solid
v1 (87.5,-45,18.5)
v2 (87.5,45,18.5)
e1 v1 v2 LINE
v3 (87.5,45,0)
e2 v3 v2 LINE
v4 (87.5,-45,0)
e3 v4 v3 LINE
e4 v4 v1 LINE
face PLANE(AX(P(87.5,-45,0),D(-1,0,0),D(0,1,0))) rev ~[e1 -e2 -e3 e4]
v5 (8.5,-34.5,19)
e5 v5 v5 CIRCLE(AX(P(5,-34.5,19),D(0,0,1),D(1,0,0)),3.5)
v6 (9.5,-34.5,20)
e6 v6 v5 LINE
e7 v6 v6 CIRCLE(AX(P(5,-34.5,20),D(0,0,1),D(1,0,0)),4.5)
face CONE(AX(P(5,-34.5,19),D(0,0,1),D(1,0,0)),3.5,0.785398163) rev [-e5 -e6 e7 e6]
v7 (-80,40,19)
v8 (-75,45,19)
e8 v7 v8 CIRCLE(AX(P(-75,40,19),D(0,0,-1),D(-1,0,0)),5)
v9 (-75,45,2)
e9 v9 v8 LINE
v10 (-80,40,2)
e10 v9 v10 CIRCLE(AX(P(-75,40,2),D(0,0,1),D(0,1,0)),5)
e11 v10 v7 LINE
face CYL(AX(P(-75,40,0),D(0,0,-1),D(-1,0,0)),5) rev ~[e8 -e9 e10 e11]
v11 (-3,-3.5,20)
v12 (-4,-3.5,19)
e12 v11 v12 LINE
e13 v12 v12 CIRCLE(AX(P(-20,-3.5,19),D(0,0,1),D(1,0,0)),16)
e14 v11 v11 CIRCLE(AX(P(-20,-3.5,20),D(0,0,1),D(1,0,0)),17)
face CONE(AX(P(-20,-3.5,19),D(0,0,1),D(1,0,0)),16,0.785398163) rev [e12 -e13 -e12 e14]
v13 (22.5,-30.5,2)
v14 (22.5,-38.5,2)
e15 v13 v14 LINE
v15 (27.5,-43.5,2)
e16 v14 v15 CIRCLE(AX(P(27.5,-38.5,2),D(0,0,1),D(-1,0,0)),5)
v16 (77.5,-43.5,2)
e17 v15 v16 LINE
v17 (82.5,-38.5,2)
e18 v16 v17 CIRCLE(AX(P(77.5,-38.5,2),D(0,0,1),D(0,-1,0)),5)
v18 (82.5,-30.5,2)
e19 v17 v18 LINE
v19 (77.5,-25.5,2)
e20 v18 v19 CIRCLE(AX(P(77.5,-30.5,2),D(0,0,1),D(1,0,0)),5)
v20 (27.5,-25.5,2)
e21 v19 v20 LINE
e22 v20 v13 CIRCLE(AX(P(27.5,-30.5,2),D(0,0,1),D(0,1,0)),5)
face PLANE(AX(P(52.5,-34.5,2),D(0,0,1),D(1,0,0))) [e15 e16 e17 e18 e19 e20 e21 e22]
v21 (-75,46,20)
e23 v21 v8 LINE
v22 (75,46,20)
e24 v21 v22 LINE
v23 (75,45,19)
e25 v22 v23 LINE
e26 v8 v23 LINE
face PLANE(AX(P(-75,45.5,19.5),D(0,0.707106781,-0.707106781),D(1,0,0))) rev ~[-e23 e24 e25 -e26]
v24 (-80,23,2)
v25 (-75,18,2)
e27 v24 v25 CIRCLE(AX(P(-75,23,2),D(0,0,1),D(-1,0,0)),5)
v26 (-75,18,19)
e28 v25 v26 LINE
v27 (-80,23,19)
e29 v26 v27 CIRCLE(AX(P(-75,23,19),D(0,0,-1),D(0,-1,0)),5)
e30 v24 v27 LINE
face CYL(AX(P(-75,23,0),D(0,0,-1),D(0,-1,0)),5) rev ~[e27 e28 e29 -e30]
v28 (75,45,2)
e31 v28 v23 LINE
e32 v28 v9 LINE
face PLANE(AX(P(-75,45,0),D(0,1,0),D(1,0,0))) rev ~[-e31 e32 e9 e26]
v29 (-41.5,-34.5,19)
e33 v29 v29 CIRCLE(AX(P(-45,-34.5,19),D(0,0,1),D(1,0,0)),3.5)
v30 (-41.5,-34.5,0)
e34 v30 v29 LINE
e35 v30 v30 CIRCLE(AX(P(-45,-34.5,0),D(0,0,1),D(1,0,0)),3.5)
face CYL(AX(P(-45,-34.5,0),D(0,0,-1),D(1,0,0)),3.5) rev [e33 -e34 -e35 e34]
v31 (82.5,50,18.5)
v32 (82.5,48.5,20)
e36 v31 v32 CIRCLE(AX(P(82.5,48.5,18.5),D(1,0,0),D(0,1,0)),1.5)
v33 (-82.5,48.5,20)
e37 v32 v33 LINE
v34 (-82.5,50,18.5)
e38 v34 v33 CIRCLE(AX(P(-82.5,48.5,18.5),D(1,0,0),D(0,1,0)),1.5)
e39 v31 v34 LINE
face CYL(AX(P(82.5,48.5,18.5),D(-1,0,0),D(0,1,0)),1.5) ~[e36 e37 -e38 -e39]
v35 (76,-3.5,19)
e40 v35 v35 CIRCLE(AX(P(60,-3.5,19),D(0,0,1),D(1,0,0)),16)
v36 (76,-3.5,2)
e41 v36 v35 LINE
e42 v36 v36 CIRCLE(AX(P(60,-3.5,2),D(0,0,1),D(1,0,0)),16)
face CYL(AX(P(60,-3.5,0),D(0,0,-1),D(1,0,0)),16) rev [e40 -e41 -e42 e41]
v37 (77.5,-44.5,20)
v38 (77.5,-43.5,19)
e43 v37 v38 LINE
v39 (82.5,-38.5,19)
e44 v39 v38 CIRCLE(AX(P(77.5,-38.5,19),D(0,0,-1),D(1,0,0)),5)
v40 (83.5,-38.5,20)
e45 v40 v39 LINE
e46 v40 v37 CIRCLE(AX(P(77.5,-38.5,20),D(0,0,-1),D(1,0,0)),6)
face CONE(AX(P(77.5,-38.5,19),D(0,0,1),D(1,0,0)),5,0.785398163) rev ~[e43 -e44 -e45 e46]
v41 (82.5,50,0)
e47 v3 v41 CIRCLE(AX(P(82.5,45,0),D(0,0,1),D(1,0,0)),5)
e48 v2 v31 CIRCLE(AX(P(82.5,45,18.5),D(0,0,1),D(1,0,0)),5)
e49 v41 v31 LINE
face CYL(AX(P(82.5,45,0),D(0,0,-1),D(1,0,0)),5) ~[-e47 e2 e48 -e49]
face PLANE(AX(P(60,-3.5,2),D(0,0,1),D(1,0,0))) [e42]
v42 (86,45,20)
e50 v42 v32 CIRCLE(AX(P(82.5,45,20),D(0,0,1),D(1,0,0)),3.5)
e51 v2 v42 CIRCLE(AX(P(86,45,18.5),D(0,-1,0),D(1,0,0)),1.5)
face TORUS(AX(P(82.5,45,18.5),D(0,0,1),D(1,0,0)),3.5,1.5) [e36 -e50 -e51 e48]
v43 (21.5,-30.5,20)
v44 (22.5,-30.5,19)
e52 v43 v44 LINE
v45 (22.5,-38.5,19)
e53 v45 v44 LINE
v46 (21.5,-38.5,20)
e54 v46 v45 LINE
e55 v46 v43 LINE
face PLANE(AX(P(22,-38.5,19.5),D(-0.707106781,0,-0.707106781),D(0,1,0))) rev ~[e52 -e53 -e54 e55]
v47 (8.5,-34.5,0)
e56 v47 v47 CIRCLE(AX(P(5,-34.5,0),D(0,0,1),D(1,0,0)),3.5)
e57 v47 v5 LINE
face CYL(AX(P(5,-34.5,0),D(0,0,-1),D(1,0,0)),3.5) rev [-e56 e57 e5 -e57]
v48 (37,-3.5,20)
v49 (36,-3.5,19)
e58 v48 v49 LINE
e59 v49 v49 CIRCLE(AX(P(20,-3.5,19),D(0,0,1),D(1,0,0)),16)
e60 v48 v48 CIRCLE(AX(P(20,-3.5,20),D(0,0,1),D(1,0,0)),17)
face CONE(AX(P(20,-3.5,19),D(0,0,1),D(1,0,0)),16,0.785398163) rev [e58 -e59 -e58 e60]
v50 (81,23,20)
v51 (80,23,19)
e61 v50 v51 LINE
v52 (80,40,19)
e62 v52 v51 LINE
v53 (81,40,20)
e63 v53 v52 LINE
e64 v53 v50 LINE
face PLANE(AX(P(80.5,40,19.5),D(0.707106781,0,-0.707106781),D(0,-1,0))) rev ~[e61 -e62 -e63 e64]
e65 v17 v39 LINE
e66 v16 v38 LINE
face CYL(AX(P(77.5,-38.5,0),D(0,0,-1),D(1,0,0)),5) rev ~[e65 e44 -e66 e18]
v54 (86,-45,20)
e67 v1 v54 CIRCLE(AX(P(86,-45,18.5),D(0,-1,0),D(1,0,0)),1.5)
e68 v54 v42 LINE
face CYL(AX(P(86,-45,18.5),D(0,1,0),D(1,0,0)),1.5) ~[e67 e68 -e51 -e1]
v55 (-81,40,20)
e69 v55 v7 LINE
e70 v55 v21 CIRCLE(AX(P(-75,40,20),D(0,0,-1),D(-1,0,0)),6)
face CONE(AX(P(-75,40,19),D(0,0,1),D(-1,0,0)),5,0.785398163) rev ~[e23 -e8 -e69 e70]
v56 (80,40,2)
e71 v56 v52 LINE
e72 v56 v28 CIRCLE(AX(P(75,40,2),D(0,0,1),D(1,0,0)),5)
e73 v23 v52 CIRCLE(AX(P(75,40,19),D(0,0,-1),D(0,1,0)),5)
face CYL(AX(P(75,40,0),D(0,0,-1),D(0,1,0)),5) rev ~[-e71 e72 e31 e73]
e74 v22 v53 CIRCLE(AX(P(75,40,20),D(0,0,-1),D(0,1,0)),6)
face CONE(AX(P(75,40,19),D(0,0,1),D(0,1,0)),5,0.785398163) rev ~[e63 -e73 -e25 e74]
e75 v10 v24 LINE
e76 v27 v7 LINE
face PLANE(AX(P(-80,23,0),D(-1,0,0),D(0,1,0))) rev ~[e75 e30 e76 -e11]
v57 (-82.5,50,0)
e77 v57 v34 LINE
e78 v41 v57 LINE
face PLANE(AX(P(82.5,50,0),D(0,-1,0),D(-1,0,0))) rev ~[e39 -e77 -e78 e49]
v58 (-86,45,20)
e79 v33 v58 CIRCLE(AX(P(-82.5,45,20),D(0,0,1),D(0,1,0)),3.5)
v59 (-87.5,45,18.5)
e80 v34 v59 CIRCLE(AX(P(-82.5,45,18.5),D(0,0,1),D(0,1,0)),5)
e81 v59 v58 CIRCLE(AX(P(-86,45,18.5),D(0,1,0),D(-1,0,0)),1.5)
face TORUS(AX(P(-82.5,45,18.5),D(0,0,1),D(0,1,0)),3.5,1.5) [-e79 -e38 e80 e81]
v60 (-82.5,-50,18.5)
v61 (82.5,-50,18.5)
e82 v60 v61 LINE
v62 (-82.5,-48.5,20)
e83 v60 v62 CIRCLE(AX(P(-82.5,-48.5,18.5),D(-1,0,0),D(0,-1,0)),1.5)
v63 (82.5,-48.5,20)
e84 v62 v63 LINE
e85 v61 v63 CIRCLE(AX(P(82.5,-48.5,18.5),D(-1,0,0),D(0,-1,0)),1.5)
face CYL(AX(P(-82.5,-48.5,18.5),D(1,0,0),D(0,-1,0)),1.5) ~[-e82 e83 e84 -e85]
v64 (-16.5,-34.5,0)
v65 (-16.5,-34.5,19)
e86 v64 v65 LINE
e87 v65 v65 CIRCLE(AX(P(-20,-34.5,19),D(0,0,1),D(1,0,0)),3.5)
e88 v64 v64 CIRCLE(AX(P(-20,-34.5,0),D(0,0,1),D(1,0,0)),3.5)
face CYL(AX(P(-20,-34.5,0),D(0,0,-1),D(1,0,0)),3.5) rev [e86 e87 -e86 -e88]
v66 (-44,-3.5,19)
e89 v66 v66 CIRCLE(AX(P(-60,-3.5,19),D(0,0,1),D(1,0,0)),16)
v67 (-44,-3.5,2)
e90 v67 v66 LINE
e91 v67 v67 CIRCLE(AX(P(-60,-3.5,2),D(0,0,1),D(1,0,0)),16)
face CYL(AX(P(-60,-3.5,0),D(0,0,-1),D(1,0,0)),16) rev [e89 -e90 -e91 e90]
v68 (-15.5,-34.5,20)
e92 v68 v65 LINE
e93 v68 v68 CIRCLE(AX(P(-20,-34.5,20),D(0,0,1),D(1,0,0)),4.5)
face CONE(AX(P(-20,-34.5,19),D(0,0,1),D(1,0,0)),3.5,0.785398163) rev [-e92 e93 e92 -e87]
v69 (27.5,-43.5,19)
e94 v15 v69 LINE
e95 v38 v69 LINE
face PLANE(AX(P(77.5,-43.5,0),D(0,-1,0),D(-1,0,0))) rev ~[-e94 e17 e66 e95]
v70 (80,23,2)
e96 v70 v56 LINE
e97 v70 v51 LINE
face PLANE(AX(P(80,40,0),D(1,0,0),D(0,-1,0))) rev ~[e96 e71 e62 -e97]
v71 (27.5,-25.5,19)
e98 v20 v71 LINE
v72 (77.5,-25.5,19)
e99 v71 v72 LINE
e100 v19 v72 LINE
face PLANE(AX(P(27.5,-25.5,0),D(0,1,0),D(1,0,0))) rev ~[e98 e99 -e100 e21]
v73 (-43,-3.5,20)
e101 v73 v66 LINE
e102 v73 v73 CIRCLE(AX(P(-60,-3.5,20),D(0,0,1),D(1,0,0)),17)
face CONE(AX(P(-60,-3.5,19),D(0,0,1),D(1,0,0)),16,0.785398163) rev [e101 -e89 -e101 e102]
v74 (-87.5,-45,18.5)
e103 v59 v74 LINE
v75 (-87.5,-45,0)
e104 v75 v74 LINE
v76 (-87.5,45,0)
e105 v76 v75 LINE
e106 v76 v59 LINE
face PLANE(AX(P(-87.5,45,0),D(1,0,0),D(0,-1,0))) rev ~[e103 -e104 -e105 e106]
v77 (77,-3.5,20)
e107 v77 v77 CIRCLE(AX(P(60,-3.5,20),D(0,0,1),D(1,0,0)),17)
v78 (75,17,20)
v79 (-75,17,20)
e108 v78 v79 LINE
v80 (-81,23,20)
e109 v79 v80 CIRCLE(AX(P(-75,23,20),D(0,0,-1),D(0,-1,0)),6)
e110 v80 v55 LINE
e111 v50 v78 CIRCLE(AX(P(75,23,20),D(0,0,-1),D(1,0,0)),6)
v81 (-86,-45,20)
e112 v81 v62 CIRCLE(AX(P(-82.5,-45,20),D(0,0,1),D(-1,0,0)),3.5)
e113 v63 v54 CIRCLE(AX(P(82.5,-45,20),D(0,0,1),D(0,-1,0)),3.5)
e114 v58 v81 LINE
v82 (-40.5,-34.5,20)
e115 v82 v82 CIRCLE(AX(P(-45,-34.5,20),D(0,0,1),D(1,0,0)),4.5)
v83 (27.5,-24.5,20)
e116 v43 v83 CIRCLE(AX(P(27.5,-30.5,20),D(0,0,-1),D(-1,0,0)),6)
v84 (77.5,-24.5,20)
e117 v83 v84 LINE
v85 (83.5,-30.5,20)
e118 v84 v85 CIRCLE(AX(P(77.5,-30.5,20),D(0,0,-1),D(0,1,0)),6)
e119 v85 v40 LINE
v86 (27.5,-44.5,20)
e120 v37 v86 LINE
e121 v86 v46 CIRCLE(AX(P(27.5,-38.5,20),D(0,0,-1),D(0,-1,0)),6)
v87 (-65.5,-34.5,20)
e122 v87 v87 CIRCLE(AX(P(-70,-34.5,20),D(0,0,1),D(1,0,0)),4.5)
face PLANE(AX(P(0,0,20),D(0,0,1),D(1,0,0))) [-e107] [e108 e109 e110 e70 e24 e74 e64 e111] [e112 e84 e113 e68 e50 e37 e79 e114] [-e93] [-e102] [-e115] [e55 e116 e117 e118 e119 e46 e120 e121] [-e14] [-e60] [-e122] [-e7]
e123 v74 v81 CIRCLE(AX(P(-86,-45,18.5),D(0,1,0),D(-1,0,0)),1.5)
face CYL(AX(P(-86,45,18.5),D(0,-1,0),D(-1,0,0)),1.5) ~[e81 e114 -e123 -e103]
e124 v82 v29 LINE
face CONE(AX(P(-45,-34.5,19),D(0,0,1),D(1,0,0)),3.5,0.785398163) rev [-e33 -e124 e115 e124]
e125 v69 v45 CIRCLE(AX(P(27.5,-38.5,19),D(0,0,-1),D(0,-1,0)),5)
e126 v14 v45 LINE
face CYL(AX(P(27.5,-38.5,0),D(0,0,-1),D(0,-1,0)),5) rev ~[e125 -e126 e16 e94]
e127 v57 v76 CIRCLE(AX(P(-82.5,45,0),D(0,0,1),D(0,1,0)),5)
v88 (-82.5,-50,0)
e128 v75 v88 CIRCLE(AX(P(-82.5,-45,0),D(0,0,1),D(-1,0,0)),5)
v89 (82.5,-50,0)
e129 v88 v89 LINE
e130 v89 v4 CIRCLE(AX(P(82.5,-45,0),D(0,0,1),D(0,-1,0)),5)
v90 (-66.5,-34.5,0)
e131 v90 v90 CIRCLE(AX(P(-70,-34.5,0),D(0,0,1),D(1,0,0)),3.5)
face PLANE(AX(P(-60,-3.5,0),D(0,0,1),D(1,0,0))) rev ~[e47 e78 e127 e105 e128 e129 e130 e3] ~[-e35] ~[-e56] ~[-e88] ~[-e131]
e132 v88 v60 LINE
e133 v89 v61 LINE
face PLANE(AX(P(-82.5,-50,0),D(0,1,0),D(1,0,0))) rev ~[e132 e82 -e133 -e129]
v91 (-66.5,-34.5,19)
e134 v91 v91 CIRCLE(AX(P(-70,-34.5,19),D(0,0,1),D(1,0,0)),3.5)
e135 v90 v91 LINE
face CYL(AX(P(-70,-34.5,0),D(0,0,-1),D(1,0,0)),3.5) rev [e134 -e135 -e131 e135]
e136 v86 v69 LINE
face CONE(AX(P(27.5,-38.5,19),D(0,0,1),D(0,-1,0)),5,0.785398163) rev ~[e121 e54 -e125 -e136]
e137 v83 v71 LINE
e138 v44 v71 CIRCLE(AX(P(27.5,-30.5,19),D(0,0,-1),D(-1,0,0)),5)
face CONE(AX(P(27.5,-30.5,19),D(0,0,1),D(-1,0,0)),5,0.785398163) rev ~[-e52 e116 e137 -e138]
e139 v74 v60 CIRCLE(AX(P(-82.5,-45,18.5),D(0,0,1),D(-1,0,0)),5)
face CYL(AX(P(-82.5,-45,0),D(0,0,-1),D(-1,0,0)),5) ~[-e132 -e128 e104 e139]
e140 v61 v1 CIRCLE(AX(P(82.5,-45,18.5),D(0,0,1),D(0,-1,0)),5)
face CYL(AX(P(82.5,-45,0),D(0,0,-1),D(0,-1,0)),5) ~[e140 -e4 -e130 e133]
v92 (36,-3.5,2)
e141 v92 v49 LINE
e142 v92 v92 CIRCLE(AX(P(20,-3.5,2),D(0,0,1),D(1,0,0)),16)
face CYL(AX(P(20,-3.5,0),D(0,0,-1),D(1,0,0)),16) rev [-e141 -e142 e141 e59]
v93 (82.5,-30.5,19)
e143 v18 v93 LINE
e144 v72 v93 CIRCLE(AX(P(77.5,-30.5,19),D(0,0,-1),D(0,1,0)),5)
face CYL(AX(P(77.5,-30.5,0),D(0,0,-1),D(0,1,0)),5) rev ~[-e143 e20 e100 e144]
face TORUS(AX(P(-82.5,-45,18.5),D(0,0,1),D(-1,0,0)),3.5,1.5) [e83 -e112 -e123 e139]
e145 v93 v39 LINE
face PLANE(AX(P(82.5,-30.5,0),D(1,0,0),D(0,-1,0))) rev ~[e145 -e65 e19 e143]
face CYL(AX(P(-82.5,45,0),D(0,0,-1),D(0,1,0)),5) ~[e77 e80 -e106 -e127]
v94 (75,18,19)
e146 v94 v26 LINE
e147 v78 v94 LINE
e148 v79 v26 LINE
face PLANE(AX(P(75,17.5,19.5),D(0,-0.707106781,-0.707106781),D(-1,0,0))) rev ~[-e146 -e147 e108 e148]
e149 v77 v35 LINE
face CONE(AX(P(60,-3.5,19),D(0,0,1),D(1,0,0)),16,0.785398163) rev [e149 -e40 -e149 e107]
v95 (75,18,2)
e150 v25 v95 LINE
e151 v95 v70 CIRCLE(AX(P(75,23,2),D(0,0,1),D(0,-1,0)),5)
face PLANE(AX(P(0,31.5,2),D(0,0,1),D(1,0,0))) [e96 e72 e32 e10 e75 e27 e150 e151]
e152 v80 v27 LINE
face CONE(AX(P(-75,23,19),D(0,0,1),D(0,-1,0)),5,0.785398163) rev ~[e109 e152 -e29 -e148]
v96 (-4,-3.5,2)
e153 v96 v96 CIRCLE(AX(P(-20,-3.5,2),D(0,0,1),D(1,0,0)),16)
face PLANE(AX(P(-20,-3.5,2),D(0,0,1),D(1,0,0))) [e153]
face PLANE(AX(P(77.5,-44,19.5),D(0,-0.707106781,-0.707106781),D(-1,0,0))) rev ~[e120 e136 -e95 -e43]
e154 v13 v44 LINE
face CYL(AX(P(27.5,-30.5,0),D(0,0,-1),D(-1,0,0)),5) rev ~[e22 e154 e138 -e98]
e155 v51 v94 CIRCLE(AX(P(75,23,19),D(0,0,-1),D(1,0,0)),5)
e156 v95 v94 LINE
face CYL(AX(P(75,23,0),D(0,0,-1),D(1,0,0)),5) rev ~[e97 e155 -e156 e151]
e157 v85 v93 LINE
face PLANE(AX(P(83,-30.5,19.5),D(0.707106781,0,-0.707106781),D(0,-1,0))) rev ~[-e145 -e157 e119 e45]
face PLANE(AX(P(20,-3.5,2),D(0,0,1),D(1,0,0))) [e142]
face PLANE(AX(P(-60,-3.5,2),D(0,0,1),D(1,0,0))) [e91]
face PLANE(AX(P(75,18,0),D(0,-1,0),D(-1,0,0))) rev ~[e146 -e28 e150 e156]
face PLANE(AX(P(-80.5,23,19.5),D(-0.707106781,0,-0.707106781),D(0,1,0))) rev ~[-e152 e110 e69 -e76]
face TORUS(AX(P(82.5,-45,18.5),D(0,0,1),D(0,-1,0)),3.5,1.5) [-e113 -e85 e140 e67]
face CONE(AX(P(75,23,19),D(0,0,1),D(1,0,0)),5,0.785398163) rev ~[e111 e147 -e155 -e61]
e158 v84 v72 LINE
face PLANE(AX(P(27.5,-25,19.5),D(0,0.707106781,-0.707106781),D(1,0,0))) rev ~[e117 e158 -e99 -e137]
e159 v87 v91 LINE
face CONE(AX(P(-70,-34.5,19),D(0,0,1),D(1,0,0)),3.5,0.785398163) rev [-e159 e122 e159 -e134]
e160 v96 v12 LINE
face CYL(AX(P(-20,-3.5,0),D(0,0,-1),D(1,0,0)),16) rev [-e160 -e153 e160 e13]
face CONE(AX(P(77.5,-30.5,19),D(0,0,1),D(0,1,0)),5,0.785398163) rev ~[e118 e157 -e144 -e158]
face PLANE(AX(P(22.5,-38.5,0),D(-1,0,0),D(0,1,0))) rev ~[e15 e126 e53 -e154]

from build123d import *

# Parameters (mm, degrees)
F0_R     = 12.5
F0_R_2   = 18
F0_R_3   = 16
F0_R_4   = 8.5
F0_R_5   = 3.5
F1_DEPTH = 20
F2_DEPTH = 2
F3_R     = 1.5
F4_SIZE  = 1
F5_SIZE  = 1


# Not quite as in the source:
# - a feature names something its author has since deleted; it is built from what else it names


with BuildPart() as f1:
    # F0 (on Top) → F1 (new body)
    with BuildSketch(Plane.XY):
        with BuildLine():
            Line((82.5, 50), (-82.5, 50))
            ThreePointArc((-82.5, 50), (-86.0355339059, 48.5355339059), (-87.5, 45))
            Line((-87.5, 45), (-87.5, -45))
            ThreePointArc((-87.5, -45), (-86.0355339059, -48.5355339059), (-82.5, -50))
            Line((-82.5, -50), (82.5, -50))
            ThreePointArc((82.5, -50), (86.0355339059, -48.5355339059), (87.5, -45))
            Line((87.5, -45), (87.5, 45))
            ThreePointArc((87.5, 45), (86.0355339059, 48.5355339059), (82.5, 50))
        make_face()
        with Locations((-70, -34.5)):
            Circle(F0_R, mode=Mode.SUBTRACT)
        with BuildLine():
            ThreePointArc((-32.5, -34.5), (-45, -47), (-57.5, -34.5))
            ThreePointArc((-57.5, -34.5), (-45, -22), (-32.5, -34.5))
        make_face(mode=Mode.SUBTRACT)
        with BuildLine():
            ThreePointArc((-7.5, -34.5), (-20, -47), (-32.5, -34.5))
            ThreePointArc((-32.5, -34.5), (-20, -22), (-7.5, -34.5))
        make_face(mode=Mode.SUBTRACT)
        with Locations((-60, -3.5)):
            Circle(F0_R_2, mode=Mode.SUBTRACT)
        with Locations((-20, -3.5)):
            Circle(F0_R_2, mode=Mode.SUBTRACT)
        with BuildLine():
            ThreePointArc((17.5, -34.5), (5, -47), (-7.5, -34.5))
            ThreePointArc((-7.5, -34.5), (5, -22), (17.5, -34.5))
        make_face(mode=Mode.SUBTRACT)
        with BuildLine():
            ThreePointArc((20.5, -30.5), (22.5502525317, -25.5502525317), (27.5, -23.5))
            Line((27.5, -23.5), (77.5, -23.5))
            ThreePointArc((77.5, -23.5), (82.4497474683, -25.5502525317), (84.5, -30.5))
            Line((84.5, -30.5), (84.5, -38.5))
            ThreePointArc((84.5, -38.5), (82.4497474683, -43.4497474683), (77.5, -45.5))
            Line((77.5, -45.5), (27.5, -45.5))
            ThreePointArc((27.5, -45.5), (22.5502525317, -43.4497474683), (20.5, -38.5))
            Line((20.5, -38.5), (20.5, -30.5))
        make_face(mode=Mode.SUBTRACT)
        with Locations((20, -3.5)):
            Circle(F0_R_2, mode=Mode.SUBTRACT)
        with Locations((60, -3.5)):
            Circle(F0_R_2, mode=Mode.SUBTRACT)
        with BuildLine():
            ThreePointArc((82, 23), (79.9497474683, 18.0502525317), (75, 16))
            Line((75, 16), (-75, 16))
            ThreePointArc((-75, 16), (-79.9497474683, 18.0502525317), (-82, 23))
            Line((-82, 23), (-82, 40))
            ThreePointArc((-82, 40), (-79.9497474683, 44.9497474683), (-75, 47))
            Line((-75, 47), (75, 47))
            ThreePointArc((75, 47), (79.9497474683, 44.9497474683), (82, 40))
            Line((82, 40), (82, 23))
        make_face(mode=Mode.SUBTRACT)
        with BuildLine():
            Line((-75, 16), (75, 16))
            ThreePointArc((75, 16), (79.9497474683, 18.0502525317), (82, 23))
            Line((82, 23), (82, 40))
            ThreePointArc((82, 40), (79.9497474683, 44.9497474683), (75, 47))
            Line((75, 47), (-75, 47))
            ThreePointArc((-75, 47), (-79.9497474683, 44.9497474683), (-82, 40))
            Line((-82, 40), (-82, 23))
            ThreePointArc((-82, 23), (-79.9497474683, 18.0502525317), (-75, 16))
        make_face()
        with BuildLine():
            ThreePointArc((80, 23), (78.5355339059, 19.4644660941), (75, 18))
            Line((75, 18), (-75, 18))
            ThreePointArc((-75, 18), (-78.5355339059, 19.4644660941), (-80, 23))
            Line((-80, 23), (-80, 40))
            ThreePointArc((-80, 40), (-78.5355339059, 43.5355339059), (-75, 45))
            Line((-75, 45), (75, 45))
            ThreePointArc((75, 45), (78.5355339059, 43.5355339059), (80, 40))
            Line((80, 40), (80, 23))
        make_face(mode=Mode.SUBTRACT)
        with Locations((60, -3.5)):
            Circle(F0_R_2)
        with Locations((60, -3.5)):
            Circle(F0_R_3, mode=Mode.SUBTRACT)
        with Locations((20, -3.5)):
            Circle(F0_R_2)
        with Locations((20, -3.5)):
            Circle(F0_R_3, mode=Mode.SUBTRACT)
        with Locations((-20, -3.5)):
            Circle(F0_R_2)
        with Locations((-20, -3.5)):
            Circle(F0_R_3, mode=Mode.SUBTRACT)
        with Locations((-60, -3.5)):
            Circle(F0_R_2)
        with Locations((-60, -3.5)):
            Circle(F0_R_3, mode=Mode.SUBTRACT)
        with Locations((-70, -34.5)):
            Circle(F0_R)
        with Locations((-70, -34.5)):
            Circle(F0_R_4, mode=Mode.SUBTRACT)
        with Locations((-70, -34.5)):
            Circle(F0_R_4)
        with Locations((-70, -34.5)):
            Circle(F0_R_5, mode=Mode.SUBTRACT)
        with BuildLine():
            ThreePointArc((-32.5, -34.5), (-45, -22), (-57.5, -34.5))
            ThreePointArc((-57.5, -34.5), (-45, -47), (-32.5, -34.5))
        make_face()
        with Locations((-45, -34.5)):
            Circle(F0_R_4, mode=Mode.SUBTRACT)
        with Locations((-45, -34.5)):
            Circle(F0_R_4)
        with Locations((-45, -34.5)):
            Circle(F0_R_5, mode=Mode.SUBTRACT)
        with BuildLine():
            ThreePointArc((-7.5, -34.5), (-20, -22), (-32.5, -34.5))
            ThreePointArc((-32.5, -34.5), (-20, -47), (-7.5, -34.5))
        make_face()
        with Locations((-20, -34.5)):
            Circle(F0_R_4, mode=Mode.SUBTRACT)
        with Locations((-20, -34.5)):
            Circle(F0_R_4)
        with Locations((-20, -34.5)):
            Circle(F0_R_5, mode=Mode.SUBTRACT)
        with BuildLine():
            ThreePointArc((17.5, -34.5), (5, -22), (-7.5, -34.5))
            ThreePointArc((-7.5, -34.5), (5, -47), (17.5, -34.5))
        make_face()
        with Locations((5, -34.5)):
            Circle(F0_R_4, mode=Mode.SUBTRACT)
        with Locations((5, -34.5)):
            Circle(F0_R_4)
        with Locations((5, -34.5)):
            Circle(F0_R_5, mode=Mode.SUBTRACT)
        with BuildLine():
            Line((77.5, -23.5), (27.5, -23.5))
            ThreePointArc((27.5, -23.5), (22.5502525317, -25.5502525317), (20.5, -30.5))
            Line((20.5, -30.5), (20.5, -38.5))
            ThreePointArc((20.5, -38.5), (22.5502525317, -43.4497474683), (27.5, -45.5))
            Line((27.5, -45.5), (77.5, -45.5))
            ThreePointArc((77.5, -45.5), (82.4497474683, -43.4497474683), (84.5, -38.5))
            Line((84.5, -38.5), (84.5, -30.5))
            ThreePointArc((84.5, -30.5), (82.4497474683, -25.5502525317), (77.5, -23.5))
        make_face()
        with BuildLine():
            Line((27.5, -25.5), (77.5, -25.5))
            ThreePointArc((77.5, -25.5), (81.0355339059, -26.9644660941), (82.5, -30.5))
            Line((82.5, -30.5), (82.5, -38.5))
            ThreePointArc((82.5, -38.5), (81.0355339059, -42.0355339059), (77.5, -43.5))
            Line((77.5, -43.5), (27.5, -43.5))
            ThreePointArc((27.5, -43.5), (23.9644660941, -42.0355339059), (22.5, -38.5))
            Line((22.5, -38.5), (22.5, -30.5))
            ThreePointArc((22.5, -30.5), (23.9644660941, -26.9644660941), (27.5, -25.5))
        make_face(mode=Mode.SUBTRACT)
    extrude(amount=F1_DEPTH)

    # F0 (on Top) → F2 (join)
    with BuildSketch(Plane.XY):
        with Locations((-60, -3.5)):
            Circle(F0_R_3)
        with Locations((-20, -3.5)):
            Circle(F0_R_3)
        with Locations((60, -3.5)):
            Circle(F0_R_3)
        with BuildLine():
            Line((-75, 18), (75, 18))
            ThreePointArc((75, 18), (78.5355339059, 19.4644660941), (80, 23))
            Line((80, 23), (80, 40))
            ThreePointArc((80, 40), (78.5355339059, 43.5355339059), (75, 45))
            Line((75, 45), (-75, 45))
            ThreePointArc((-75, 45), (-78.5355339059, 43.5355339059), (-80, 40))
            Line((-80, 40), (-80, 23))
            ThreePointArc((-80, 23), (-78.5355339059, 19.4644660941), (-75, 18))
        make_face()
        with BuildLine():
            ThreePointArc((82.5, -30.5), (81.0355339059, -26.9644660941), (77.5, -25.5))
            Line((77.5, -25.5), (27.5, -25.5))
            ThreePointArc((27.5, -25.5), (23.9644660941, -26.9644660941), (22.5, -30.5))
            Line((22.5, -30.5), (22.5, -38.5))
            ThreePointArc((22.5, -38.5), (23.9644660941, -42.0355339059), (27.5, -43.5))
            Line((27.5, -43.5), (77.5, -43.5))
            ThreePointArc((77.5, -43.5), (81.0355339059, -42.0355339059), (82.5, -38.5))
            Line((82.5, -38.5), (82.5, -30.5))
        make_face()
        with Locations((20, -3.5)):
            Circle(F0_R_3)
    extrude(amount=F2_DEPTH)

    # F3
    f3_edges = [f1.edges().sort_by_distance(p)[0] for p in [
        (0, -50, 20),
    ]]
    fillet(f3_edges, radius=F3_R)

    # F4
    f4_edges = [f1.edges().sort_by_distance(p)[0] for p in [
        (-76, -3.5, 20),
        (-36, -3.5, 20),
        (44, -3.5, 20),
        (-78.535534, 43.535534, 20),
        (-80, 31.5, 20),
        (22.5, -30.5, 11),
        (23.964466, -26.964466, 20),
        (4, -3.5, 20),
    ]]
    chamfer(f4_edges, length=F4_SIZE)

    # F5
    f5_edges = [f1.edges().sort_by_distance(p)[0] for p in [
        (-73.5, -34.5, 20),
        (-48.5, -34.5, 20),
        (-23.5, -34.5, 20),
        (1.5, -34.5, 20),
    ]]
    chamfer(f5_edges, length=F5_SIZE)


solid = f1.part
